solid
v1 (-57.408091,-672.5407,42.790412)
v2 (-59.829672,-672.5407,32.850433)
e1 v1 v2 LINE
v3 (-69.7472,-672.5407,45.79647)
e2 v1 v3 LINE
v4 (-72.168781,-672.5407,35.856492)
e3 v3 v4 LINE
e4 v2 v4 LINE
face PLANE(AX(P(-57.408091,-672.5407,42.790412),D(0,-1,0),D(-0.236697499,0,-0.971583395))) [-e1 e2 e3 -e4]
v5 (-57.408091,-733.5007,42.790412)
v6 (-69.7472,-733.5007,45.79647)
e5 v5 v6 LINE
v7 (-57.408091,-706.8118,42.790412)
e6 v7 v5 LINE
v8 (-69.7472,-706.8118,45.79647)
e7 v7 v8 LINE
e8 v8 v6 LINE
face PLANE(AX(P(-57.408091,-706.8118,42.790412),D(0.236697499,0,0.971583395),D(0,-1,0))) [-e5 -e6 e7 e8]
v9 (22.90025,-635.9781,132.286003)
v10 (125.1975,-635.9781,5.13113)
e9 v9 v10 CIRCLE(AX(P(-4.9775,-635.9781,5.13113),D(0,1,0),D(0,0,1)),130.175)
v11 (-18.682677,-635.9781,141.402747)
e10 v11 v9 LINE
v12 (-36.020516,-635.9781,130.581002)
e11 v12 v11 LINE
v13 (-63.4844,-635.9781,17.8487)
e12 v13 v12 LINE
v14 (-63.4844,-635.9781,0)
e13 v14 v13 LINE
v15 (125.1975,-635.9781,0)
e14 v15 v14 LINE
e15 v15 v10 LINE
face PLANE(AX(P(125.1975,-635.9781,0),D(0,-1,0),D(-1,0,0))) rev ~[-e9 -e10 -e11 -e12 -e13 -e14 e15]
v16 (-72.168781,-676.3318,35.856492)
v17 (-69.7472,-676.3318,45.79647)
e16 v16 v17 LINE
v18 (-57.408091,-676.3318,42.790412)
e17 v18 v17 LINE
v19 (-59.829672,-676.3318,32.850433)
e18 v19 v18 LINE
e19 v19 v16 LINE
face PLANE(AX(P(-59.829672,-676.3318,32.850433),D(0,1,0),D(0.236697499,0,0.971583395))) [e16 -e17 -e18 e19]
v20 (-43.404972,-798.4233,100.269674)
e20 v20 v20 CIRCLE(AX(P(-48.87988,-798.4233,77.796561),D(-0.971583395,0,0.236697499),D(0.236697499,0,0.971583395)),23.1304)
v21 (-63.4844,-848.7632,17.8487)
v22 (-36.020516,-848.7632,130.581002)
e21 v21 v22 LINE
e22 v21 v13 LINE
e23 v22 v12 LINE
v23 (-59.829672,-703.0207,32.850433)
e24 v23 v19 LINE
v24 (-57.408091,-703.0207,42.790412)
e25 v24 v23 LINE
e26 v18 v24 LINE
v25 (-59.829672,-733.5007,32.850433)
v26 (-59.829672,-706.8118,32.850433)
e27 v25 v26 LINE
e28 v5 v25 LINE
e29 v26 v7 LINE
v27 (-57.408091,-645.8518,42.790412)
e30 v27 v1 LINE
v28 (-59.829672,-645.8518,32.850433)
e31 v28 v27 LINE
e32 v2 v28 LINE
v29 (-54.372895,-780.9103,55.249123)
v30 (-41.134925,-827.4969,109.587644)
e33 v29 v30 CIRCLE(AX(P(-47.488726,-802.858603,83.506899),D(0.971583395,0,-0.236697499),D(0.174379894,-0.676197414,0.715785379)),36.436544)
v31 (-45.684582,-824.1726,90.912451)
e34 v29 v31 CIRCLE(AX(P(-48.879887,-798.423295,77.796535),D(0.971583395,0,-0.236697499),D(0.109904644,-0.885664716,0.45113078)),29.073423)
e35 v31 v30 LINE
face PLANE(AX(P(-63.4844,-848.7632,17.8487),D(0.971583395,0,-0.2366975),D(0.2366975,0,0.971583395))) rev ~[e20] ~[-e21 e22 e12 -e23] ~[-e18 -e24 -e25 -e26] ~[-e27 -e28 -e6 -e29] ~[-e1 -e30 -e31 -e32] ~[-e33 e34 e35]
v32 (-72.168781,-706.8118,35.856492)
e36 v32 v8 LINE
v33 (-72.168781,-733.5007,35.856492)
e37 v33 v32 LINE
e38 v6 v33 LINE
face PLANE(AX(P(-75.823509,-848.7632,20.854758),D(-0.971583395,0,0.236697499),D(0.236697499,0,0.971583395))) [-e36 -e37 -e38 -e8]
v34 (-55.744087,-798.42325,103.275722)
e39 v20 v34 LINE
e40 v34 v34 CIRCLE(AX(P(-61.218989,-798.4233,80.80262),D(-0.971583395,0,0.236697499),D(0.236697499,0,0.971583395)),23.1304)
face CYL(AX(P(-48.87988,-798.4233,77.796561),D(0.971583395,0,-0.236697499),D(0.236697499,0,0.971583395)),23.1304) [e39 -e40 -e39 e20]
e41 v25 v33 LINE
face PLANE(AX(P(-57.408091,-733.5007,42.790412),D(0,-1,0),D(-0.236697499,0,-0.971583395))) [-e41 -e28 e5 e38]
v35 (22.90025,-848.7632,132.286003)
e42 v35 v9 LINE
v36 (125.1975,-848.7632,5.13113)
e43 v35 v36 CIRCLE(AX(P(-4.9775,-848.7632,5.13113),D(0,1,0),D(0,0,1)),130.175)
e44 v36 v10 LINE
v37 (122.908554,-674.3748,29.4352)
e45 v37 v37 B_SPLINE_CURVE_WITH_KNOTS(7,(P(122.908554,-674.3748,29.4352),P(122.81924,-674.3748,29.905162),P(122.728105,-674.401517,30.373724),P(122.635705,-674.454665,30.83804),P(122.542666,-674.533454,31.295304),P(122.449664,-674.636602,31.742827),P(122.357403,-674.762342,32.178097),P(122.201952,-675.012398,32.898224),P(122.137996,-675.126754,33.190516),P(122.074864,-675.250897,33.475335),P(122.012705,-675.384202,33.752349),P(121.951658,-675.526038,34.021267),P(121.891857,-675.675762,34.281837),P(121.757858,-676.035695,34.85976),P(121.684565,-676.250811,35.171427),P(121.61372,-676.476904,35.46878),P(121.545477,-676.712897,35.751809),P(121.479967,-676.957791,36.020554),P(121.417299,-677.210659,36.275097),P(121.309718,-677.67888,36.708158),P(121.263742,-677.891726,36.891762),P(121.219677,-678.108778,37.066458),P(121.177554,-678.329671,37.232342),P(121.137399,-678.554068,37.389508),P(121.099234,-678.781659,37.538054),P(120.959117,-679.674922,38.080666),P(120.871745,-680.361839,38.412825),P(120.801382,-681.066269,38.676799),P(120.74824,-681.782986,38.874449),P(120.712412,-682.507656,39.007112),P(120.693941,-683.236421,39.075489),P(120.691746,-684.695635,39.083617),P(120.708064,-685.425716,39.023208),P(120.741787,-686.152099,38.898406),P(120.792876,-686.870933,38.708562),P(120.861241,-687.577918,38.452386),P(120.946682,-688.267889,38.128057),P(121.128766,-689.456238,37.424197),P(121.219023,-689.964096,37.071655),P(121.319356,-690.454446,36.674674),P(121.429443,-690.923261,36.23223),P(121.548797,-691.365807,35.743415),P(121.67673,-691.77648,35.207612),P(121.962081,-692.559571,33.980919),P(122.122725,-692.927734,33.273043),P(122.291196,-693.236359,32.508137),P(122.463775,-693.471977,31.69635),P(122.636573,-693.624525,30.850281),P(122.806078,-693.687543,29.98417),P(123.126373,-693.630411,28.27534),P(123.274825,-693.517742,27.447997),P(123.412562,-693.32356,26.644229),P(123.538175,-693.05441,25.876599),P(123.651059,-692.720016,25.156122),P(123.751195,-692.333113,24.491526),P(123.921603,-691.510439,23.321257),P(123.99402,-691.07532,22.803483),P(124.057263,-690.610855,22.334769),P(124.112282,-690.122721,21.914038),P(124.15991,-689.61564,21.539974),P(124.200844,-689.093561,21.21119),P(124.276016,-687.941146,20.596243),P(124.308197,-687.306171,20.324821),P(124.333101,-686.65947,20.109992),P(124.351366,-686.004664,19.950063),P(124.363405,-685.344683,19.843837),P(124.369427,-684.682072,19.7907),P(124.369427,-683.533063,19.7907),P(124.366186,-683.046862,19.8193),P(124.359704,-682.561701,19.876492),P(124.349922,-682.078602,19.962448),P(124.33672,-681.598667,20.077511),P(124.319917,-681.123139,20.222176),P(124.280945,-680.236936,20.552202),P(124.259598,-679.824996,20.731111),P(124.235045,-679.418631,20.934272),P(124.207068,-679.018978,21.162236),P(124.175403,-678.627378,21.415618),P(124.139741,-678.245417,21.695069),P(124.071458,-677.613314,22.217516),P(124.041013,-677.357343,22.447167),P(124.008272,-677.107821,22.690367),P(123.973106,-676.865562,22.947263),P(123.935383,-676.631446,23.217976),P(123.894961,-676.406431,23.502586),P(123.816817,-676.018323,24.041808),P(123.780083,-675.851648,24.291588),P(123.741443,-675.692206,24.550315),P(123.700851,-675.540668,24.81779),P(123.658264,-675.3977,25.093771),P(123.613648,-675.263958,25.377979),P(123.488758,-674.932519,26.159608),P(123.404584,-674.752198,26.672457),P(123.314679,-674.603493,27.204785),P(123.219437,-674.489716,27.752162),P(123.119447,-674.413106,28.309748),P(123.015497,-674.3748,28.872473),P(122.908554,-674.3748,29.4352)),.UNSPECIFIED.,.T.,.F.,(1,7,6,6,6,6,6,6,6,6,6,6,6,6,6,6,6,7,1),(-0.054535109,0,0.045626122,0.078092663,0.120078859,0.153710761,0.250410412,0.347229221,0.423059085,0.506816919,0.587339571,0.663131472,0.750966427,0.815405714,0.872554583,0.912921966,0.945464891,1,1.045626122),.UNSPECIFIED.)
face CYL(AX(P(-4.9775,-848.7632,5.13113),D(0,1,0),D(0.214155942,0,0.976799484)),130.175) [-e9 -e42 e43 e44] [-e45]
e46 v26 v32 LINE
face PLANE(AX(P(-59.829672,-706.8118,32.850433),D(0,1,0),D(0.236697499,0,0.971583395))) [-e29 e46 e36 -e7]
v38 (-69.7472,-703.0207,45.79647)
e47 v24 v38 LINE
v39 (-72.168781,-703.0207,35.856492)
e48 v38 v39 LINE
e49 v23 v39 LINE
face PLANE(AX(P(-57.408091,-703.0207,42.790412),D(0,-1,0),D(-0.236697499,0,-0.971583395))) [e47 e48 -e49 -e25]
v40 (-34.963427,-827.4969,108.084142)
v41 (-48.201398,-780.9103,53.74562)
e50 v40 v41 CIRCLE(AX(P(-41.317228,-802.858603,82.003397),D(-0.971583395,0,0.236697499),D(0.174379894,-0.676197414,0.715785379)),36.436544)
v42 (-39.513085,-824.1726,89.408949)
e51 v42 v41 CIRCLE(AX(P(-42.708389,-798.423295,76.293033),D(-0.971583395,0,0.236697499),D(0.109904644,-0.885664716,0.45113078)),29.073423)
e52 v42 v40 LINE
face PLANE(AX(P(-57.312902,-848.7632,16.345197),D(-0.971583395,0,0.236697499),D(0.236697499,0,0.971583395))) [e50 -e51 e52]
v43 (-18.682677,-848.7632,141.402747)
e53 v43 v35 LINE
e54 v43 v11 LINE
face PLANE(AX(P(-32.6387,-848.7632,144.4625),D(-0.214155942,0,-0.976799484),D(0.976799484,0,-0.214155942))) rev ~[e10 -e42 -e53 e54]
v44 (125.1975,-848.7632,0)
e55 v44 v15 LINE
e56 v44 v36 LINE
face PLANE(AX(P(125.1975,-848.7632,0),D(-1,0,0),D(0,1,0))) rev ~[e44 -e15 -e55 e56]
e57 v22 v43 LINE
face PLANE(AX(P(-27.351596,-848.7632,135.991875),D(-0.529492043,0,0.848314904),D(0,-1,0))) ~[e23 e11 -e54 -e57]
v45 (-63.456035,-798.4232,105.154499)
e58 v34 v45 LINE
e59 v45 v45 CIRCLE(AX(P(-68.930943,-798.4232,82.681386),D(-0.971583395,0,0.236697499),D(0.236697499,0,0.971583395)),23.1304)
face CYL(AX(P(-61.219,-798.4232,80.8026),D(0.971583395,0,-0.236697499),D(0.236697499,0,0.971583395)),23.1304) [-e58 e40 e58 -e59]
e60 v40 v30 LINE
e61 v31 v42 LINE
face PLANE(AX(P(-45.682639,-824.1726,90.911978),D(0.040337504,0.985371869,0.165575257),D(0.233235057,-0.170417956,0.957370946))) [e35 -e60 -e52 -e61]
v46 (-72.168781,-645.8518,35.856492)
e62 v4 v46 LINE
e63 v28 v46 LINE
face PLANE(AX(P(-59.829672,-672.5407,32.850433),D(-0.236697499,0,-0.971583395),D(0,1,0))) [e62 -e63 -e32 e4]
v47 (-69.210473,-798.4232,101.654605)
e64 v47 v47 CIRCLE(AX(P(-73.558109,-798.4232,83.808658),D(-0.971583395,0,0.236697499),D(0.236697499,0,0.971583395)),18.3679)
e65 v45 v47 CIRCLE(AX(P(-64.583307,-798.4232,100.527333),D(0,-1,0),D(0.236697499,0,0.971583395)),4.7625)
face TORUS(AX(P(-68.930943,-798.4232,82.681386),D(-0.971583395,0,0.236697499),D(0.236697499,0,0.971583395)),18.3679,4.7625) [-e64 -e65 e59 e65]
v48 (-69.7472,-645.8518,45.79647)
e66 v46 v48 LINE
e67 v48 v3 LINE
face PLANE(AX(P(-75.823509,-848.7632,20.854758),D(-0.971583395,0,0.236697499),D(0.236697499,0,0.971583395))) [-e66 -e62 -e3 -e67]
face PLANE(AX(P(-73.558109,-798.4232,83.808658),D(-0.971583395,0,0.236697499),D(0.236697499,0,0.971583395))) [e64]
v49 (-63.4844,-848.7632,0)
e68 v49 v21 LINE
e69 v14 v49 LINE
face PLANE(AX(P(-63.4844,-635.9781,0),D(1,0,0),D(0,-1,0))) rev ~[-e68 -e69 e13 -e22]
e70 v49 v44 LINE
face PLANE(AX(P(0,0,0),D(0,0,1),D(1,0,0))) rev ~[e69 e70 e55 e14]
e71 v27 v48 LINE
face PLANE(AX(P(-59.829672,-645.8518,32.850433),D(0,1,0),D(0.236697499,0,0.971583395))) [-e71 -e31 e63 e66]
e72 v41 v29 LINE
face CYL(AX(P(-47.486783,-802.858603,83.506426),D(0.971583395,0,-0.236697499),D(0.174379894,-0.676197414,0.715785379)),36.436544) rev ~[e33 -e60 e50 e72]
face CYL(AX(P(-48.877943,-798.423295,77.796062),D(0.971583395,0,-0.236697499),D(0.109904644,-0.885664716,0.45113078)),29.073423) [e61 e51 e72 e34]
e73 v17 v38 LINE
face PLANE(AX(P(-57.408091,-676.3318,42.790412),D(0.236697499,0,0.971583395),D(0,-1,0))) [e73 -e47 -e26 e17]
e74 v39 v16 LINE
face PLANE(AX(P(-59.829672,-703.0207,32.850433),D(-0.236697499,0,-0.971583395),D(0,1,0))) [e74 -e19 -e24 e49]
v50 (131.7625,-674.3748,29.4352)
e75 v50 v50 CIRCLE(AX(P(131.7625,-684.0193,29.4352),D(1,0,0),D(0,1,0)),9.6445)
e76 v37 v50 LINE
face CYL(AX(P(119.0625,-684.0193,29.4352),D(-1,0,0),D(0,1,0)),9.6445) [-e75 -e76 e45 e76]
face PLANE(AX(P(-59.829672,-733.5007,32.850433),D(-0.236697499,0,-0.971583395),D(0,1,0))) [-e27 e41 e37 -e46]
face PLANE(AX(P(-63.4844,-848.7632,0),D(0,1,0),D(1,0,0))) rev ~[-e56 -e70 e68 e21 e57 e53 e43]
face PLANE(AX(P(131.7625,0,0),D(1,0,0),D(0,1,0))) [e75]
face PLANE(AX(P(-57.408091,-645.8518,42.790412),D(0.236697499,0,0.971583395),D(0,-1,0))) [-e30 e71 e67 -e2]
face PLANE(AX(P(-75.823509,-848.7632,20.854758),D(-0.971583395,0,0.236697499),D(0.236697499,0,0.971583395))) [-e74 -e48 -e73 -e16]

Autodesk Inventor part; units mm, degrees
ref_plane "XZ Plane" through (0, 0, 0) normal (0, 1, 0) x (-1, 0, 0)
ref_plane "XY Plane" through (0, 0, 0) normal (0, 0, 1) x (1, 0, 0)
sketch "Sketch1" plane through (0, 0, 0) normal (0, 0, 1) x (1, 0, 0)
  line L0 (125.1975, -635.9781) -> (-63.4844, -635.9781)
  line L1 (-63.4844, -635.9781) -> (-63.4844, -848.7632)
  line L2 (-63.4844, -848.7632) -> (125.1975, -848.7632)
  line L3 (125.1975, -848.7632) -> (125.1975, -635.9781)
  point P0 (0, 0)
extrude "Extrusion1" add sketch "Sketch1" along normal blind 144.4625
sketch "Sketch2" plane through (-63.4844, -848.7632, 0) normal (0, -1, 0) x (1, 0, 0)
  line L0 (188.6819, 144.4625) -> (0, 144.4625) projected
  line L1 (0, 0) -> (0, 144.4625) projected
  line L2 (188.6819, 0) -> (188.6819, 144.4625) projected
  line L3 (0, 17.8487) -> (30.8457, 144.4625)
  line L4 (30.8457, 144.4625) -> (188.6819, 109.8581)
  point P0 (63.4844, 0)
extrude "Extrusion2" cut sketch "Sketch2" against normal through all
sketch "Sketch3" plane through (-63.4844, -848.7632, 17.8487) normal (-0.9715834, 0, 0.2366975) x (0.2366975, 0, 0.9715834)
  line L0 (0, 0) -> (0, 212.7851) projected
  circle A0 centre (61.7012, 50.3399) radius 23.1304
  line L1 (15.4405, 202.9114) -> (25.6712, 202.9114)
  line L2 (25.6712, 202.9114) -> (25.6712, 176.2225)
  line L3 (25.6712, 176.2225) -> (15.4405, 176.2225)
  line L4 (15.4405, 176.2225) -> (15.4405, 202.9114)
  line L5 (15.4405, 172.4314) -> (25.6712, 172.4314)
  line L6 (25.6712, 172.4314) -> (25.6712, 145.7425)
  line L7 (25.6712, 145.7425) -> (15.4405, 145.7425)
  line L8 (15.4405, 145.7425) -> (15.4405, 172.4314)
  line L9 (15.4405, 141.9514) -> (25.6712, 141.9514)
  line L10 (25.6712, 141.9514) -> (25.6712, 115.2625)
  line L11 (25.6712, 115.2625) -> (15.4405, 115.2625)
  line L12 (15.4405, 115.2625) -> (15.4405, 141.9514)
  point P0 (-2.3149, 848.7632)
  dimension "d6" = 30.48
extrude "Extrusion3" add sketch "Sketch3" along normal blind 12.7
sketch "Sketch4" plane through (-61.219, -798.4232, 80.8026) normal (-0.9715834, 0, 0.2366975) x (0.2366975, 0, 0.9715834)
  circle A0 centre (0, 0) radius 23.1304 projected
  point P0 (-64.0161, 798.4232)
extrude "Extrusion4" add sketch "Sketch4" along normal blind 12.7
sketch "Sketch5" plane through (-63.4844, -848.7632, 17.8487) normal (-0.9715834, 0, 0.2366975) x (0.2366975, 0, 0.9715834)
  circle A0 centre (61.7012, 50.3399) radius 23.1304 projected
  circle A1 centre (61.7012, 50.3399) radius 29.0734 construction
  circle A2 centre (61.7012, 50.3399) radius 43.7714 construction
  line L0 (61.7012, 50.3399) -> (82.0253, 11.5731) construction
  arc A3 (94.4221, 21.2663) -> (38.4943, 67.8529) centre (67.5786, 45.9046) ccw
  line L1 (75.2007, 24.5906) -> (94.4221, 21.2663)
  arc A4 (75.2007, 24.5906) -> (38.4943, 67.8529) centre (61.7012, 50.3399) ccw
  point P0 (-2.3149, 848.7632)
  dimension "d15" = 87.5428
  dimension "d16" = 58.1469
extrude "Extrusion5" cut sketch "Sketch5" along normal mid plane 12.7 contours L1 A4 A3
fillet "Fillet1" radius 130.175 1 edges at (125.1975, -742.3706, 109.8581)
fillet "Fillet2" radius 4.7625 1 edges at (-79.033, -798.4232, 61.3356)
chamfer "Chamfer1" distance 14.2875 angle 45 1 edges at (-32.6387, -742.3706, 144.4625)
ref_plane "Work Plane1" through (119.0625, 0, 0) normal (1, 0, 0) x (0, 1, 0)
sketch "Sketch6" plane through (119.0625, 0, 0) normal (1, 0, 0) x (0, 1, 0)
  circle A0 centre (-684.0193, 29.4352) radius 9.6445
  point P0 (0, 0)
extrude "Extrusion6" add sketch "Sketch6" along normal blind 12.7
properties part number "VoltageSource"
